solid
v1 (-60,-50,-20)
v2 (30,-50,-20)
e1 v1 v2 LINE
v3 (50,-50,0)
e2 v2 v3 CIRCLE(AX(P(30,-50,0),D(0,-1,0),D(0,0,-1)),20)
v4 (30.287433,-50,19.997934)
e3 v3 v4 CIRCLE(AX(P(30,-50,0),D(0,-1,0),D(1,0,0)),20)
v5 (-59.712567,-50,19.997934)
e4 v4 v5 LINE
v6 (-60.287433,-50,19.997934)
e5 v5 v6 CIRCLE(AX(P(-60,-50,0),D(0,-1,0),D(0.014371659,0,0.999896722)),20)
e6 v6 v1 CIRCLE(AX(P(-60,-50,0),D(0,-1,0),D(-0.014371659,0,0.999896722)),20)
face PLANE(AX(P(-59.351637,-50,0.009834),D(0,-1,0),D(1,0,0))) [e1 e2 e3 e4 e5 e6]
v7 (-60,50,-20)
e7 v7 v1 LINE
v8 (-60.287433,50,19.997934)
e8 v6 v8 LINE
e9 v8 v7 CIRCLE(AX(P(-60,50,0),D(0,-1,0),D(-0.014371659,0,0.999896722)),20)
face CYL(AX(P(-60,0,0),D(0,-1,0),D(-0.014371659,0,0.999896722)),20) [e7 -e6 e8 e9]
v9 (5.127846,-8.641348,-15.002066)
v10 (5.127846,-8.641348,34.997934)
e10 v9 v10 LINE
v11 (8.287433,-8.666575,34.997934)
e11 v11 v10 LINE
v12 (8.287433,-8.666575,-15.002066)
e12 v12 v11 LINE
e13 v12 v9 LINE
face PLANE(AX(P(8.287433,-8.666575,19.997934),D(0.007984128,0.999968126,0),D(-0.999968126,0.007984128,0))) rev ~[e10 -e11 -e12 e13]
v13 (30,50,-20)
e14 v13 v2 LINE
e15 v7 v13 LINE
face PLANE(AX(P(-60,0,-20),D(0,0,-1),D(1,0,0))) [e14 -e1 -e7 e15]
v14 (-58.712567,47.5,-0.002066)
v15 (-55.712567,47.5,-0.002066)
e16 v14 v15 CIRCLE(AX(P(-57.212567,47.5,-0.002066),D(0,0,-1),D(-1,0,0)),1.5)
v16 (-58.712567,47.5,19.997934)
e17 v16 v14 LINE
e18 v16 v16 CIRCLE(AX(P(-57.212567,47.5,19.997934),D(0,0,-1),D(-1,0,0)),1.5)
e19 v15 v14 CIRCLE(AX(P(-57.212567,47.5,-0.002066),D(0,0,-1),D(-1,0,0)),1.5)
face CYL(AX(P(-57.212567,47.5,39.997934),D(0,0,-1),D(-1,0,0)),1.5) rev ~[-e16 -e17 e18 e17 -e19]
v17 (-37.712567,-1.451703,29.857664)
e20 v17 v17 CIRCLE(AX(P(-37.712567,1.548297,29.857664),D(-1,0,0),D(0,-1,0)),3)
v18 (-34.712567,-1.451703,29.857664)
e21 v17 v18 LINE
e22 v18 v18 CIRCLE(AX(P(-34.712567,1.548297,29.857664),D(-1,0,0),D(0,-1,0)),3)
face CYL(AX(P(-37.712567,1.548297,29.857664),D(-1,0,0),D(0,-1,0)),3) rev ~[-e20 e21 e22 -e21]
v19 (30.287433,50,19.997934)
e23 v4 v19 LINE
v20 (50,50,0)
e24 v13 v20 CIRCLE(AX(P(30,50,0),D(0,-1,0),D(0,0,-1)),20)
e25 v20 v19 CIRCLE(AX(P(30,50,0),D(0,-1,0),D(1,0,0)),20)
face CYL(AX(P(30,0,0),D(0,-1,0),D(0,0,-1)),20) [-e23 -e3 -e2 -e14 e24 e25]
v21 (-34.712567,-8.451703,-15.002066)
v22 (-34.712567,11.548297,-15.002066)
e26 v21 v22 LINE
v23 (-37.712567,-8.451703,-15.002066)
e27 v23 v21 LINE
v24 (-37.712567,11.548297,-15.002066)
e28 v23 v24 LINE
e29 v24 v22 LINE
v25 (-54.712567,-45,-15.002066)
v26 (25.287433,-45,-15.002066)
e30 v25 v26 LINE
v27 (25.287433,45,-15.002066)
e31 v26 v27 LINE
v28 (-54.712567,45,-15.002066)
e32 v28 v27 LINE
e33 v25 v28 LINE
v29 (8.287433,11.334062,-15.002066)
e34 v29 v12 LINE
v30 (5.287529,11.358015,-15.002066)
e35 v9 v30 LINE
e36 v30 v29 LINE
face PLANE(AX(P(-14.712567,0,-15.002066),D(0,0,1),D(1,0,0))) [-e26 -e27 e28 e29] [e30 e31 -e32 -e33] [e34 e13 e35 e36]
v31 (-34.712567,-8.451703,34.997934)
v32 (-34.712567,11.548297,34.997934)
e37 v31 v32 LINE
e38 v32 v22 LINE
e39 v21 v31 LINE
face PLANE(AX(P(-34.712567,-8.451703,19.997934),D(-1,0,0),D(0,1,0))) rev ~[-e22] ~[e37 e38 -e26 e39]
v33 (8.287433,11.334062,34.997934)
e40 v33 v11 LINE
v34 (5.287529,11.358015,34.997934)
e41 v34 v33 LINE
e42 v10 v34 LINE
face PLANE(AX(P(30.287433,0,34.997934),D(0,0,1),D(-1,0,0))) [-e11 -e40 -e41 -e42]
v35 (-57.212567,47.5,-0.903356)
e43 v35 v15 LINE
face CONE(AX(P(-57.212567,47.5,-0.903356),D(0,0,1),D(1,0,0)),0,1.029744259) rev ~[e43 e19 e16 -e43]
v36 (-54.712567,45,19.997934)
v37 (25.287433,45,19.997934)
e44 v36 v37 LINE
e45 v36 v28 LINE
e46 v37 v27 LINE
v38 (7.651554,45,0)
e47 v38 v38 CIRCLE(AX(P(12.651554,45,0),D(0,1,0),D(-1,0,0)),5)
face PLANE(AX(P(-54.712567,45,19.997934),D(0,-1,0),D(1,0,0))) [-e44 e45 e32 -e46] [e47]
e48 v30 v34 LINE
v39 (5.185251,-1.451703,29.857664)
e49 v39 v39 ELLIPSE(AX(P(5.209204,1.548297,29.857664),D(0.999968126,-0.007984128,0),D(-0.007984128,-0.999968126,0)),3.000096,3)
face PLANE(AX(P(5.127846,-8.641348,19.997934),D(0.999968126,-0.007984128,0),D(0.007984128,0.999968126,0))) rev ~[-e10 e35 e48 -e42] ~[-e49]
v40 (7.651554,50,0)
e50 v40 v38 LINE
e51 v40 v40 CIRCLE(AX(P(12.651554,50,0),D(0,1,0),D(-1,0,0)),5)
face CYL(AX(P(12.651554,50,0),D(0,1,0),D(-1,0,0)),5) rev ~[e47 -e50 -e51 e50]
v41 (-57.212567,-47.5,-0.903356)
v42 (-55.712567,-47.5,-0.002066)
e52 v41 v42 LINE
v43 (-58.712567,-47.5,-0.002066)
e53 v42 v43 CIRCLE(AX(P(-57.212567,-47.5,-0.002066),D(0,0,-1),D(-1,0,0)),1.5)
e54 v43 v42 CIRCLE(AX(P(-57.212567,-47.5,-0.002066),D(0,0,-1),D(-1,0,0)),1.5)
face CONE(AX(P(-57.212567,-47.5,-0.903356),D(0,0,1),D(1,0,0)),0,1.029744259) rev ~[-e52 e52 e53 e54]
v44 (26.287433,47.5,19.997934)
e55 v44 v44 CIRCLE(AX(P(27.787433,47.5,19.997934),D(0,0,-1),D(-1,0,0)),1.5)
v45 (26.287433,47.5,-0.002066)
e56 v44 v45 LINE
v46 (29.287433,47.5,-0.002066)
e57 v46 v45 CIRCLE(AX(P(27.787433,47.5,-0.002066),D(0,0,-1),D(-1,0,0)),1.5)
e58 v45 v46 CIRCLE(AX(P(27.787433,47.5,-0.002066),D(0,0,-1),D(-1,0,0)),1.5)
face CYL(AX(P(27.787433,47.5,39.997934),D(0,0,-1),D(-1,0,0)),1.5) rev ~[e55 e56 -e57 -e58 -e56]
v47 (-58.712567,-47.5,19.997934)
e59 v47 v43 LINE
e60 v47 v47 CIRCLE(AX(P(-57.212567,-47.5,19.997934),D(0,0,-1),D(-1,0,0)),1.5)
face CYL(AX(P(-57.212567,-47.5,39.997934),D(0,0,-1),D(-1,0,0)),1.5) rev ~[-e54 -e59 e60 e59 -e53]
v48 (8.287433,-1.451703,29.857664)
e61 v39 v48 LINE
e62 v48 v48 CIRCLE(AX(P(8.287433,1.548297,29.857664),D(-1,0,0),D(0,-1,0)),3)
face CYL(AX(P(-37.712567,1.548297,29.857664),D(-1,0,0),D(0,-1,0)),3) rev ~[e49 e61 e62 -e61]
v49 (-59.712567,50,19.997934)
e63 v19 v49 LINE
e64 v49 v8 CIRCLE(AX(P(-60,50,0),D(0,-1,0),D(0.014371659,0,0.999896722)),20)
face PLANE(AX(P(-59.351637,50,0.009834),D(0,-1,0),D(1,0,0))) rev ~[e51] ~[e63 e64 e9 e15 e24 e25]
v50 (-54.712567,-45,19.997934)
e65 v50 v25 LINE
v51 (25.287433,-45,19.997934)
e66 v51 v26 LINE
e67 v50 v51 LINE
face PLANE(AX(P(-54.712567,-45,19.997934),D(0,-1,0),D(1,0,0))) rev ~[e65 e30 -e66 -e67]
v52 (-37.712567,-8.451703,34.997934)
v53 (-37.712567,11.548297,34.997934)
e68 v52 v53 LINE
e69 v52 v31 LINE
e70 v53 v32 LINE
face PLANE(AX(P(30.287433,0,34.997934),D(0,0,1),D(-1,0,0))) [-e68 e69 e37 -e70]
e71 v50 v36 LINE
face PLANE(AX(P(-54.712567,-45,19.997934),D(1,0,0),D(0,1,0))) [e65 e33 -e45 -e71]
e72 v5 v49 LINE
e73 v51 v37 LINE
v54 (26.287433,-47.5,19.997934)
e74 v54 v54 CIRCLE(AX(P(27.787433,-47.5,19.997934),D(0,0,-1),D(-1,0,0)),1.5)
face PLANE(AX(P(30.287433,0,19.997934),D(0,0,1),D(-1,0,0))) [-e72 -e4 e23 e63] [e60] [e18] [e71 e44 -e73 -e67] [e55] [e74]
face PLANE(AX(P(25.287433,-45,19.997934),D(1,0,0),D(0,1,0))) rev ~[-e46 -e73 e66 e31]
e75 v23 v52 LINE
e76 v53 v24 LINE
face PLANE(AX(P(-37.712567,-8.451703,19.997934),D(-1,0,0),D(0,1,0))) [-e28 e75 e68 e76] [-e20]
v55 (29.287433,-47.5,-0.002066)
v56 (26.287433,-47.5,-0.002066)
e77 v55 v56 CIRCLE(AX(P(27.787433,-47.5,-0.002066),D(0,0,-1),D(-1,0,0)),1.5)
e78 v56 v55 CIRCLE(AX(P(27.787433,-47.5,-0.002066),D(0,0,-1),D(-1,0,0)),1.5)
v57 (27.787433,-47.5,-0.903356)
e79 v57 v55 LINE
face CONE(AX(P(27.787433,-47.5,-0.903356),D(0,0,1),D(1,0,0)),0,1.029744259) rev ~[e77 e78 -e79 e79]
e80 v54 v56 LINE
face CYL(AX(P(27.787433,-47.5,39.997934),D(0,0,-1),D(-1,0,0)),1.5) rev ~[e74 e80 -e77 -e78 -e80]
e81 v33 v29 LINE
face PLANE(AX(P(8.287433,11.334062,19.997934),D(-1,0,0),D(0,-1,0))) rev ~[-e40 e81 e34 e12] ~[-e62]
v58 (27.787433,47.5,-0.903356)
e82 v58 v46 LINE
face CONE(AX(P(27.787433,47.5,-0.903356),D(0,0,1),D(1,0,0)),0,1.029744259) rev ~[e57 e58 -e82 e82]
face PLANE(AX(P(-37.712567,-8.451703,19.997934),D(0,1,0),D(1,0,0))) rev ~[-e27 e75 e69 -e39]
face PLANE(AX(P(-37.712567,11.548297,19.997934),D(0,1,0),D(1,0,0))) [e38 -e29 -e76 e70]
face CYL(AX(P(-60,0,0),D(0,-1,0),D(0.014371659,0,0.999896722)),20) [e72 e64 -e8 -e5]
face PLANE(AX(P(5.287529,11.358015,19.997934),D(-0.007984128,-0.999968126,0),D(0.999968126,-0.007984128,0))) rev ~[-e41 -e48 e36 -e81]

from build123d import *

# Parameters (mm, degrees)
F1_DEPTH = 50
F2_W     = 80
F2_H     = 90
F2_W_2   = 3
F2_H_2   = 20
F3_DEPTH = 35
F4_D     = 3
F4_DEPTH = 20
F4_TIP   = 0.9012909285
F5_R     = 5
F6_DEPTH = 10
F7_DEPTH = 15
F8_R     = 3
F9_DEPTH = 60


# Not quite as in the source:
# - a feature names something its author has since deleted; it is built from what else it names


with BuildPart() as f1:
    # F0 (on Front) → F1 (new body, symmetric)
    with BuildSketch(Plane.XZ):
        with BuildLine():
            Line((-59.7125668165, 19.9979344475), (-60.2874331835, 19.9979344475))
            ThreePointArc((-60.2874331835, 19.9979344475), (-79.9994836052, -0.1437203026), (-60, -20))
            ThreePointArc((-60, -20), (-45.8578643763, -14.1421356237), (-40, 0))
            ThreePointArc((-40, 0), (-45.756603922, 14.0401448769), (-59.7125668165, 19.9979344475))
        make_face()
        with BuildLine():
            ThreePointArc((-59.7125668165, 19.9979344475), (-60, 20), (-60.2874331835, 19.9979344475))
            Line((-60.2874331835, 19.9979344475), (-59.7125668165, 19.9979344475))
        make_face()
        with BuildLine():
            ThreePointArc((-40, 0), (-45.8578643763, -14.1421356237), (-60, -20))
            Line((-60, -20), (30, -20))
            ThreePointArc((30, -20), (10.0005163948, -0.1437203026), (29.7125668165, 19.9979344475))
            Line((29.7125668165, 19.9979344475), (-59.7125668165, 19.9979344475))
            ThreePointArc((-59.7125668165, 19.9979344475), (-45.756603922, 14.0401448769), (-40, 0))
        make_face()
        with BuildLine():
            ThreePointArc((29.7125668165, 19.9979344475), (10.0005163948, -0.1437203026), (30, -20))
            ThreePointArc((30, -20), (44.1421356237, -14.1421356237), (50, 0))
            ThreePointArc((50, 0), (44.243396078, 14.0401448769), (30.2874331835, 19.9979344475))
            Line((30.2874331835, 19.9979344475), (29.7125668165, 19.9979344475))
        make_face()
    extrude(amount=F1_DEPTH, both=True)

    # F2 (on face) → F3 (cut)
    with BuildSketch(Plane.XY.offset(19.9979344475)):
        with Locations((-14.7125668165, 0)):
            Rectangle(F2_W, F2_H)
        with Locations((-36.2125668165, 1.5482969955)):
            Rectangle(F2_W_2, F2_H_2, mode=Mode.SUBTRACT)
        Polygon((8.2874331835, 11.3340624973), (8.2874331835, -8.6665749961), (5.1278462474, -8.641347646), (5.2875288045, 11.3580148809), align=None, mode=Mode.SUBTRACT)
    extrude(amount=-F3_DEPTH, mode=Mode.SUBTRACT)

    # F4
    with Locations(Plane.XY.offset(19.9979344475)):
        with Locations((-57.2125668165, 47.5), (27.7874331835, 47.5), (27.7874331835, -47.5), (-57.2125668165, -47.5)):
            Hole(F4_D / 2, depth=F4_DEPTH)
            with Locations((0, 0, -(F4_DEPTH + F4_TIP / 2))):  # 118° drill point
                Cone(0, F4_D / 2, F4_TIP, mode=Mode.SUBTRACT)

    # F5 (on face) → F6 (cut)
    with BuildSketch(Plane(origin=(0, 50, 0), x_dir=(-1, 0, 0), z_dir=(0, 1, 0))):
        with Locations((-12.6515543088, 0)):
            Circle(F5_R)
    extrude(amount=-F6_DEPTH, mode=Mode.SUBTRACT)

    # F7 (add): faces of the model
    f7_faces = [f1.faces().sort_by_distance(p)[0] for p in [
        (-36.2125668165, 1.5482969955, 19.9979344475),
        (6.7472153787, 1.2596232378, 19.9979344475),
    ]]
    extrude(f7_faces, amount=F7_DEPTH)

    # F8 (on face) → F9 (cut)
    with BuildSketch(Plane(origin=(-37.7125668165, 0, 0), x_dir=(0, -1, 0), z_dir=(-1, 0, 0))):
        with Locations((-1.5482969955, 29.857664355)):
            Circle(F8_R)
    extrude(amount=-F9_DEPTH, mode=Mode.SUBTRACT)


solid = f1.part
